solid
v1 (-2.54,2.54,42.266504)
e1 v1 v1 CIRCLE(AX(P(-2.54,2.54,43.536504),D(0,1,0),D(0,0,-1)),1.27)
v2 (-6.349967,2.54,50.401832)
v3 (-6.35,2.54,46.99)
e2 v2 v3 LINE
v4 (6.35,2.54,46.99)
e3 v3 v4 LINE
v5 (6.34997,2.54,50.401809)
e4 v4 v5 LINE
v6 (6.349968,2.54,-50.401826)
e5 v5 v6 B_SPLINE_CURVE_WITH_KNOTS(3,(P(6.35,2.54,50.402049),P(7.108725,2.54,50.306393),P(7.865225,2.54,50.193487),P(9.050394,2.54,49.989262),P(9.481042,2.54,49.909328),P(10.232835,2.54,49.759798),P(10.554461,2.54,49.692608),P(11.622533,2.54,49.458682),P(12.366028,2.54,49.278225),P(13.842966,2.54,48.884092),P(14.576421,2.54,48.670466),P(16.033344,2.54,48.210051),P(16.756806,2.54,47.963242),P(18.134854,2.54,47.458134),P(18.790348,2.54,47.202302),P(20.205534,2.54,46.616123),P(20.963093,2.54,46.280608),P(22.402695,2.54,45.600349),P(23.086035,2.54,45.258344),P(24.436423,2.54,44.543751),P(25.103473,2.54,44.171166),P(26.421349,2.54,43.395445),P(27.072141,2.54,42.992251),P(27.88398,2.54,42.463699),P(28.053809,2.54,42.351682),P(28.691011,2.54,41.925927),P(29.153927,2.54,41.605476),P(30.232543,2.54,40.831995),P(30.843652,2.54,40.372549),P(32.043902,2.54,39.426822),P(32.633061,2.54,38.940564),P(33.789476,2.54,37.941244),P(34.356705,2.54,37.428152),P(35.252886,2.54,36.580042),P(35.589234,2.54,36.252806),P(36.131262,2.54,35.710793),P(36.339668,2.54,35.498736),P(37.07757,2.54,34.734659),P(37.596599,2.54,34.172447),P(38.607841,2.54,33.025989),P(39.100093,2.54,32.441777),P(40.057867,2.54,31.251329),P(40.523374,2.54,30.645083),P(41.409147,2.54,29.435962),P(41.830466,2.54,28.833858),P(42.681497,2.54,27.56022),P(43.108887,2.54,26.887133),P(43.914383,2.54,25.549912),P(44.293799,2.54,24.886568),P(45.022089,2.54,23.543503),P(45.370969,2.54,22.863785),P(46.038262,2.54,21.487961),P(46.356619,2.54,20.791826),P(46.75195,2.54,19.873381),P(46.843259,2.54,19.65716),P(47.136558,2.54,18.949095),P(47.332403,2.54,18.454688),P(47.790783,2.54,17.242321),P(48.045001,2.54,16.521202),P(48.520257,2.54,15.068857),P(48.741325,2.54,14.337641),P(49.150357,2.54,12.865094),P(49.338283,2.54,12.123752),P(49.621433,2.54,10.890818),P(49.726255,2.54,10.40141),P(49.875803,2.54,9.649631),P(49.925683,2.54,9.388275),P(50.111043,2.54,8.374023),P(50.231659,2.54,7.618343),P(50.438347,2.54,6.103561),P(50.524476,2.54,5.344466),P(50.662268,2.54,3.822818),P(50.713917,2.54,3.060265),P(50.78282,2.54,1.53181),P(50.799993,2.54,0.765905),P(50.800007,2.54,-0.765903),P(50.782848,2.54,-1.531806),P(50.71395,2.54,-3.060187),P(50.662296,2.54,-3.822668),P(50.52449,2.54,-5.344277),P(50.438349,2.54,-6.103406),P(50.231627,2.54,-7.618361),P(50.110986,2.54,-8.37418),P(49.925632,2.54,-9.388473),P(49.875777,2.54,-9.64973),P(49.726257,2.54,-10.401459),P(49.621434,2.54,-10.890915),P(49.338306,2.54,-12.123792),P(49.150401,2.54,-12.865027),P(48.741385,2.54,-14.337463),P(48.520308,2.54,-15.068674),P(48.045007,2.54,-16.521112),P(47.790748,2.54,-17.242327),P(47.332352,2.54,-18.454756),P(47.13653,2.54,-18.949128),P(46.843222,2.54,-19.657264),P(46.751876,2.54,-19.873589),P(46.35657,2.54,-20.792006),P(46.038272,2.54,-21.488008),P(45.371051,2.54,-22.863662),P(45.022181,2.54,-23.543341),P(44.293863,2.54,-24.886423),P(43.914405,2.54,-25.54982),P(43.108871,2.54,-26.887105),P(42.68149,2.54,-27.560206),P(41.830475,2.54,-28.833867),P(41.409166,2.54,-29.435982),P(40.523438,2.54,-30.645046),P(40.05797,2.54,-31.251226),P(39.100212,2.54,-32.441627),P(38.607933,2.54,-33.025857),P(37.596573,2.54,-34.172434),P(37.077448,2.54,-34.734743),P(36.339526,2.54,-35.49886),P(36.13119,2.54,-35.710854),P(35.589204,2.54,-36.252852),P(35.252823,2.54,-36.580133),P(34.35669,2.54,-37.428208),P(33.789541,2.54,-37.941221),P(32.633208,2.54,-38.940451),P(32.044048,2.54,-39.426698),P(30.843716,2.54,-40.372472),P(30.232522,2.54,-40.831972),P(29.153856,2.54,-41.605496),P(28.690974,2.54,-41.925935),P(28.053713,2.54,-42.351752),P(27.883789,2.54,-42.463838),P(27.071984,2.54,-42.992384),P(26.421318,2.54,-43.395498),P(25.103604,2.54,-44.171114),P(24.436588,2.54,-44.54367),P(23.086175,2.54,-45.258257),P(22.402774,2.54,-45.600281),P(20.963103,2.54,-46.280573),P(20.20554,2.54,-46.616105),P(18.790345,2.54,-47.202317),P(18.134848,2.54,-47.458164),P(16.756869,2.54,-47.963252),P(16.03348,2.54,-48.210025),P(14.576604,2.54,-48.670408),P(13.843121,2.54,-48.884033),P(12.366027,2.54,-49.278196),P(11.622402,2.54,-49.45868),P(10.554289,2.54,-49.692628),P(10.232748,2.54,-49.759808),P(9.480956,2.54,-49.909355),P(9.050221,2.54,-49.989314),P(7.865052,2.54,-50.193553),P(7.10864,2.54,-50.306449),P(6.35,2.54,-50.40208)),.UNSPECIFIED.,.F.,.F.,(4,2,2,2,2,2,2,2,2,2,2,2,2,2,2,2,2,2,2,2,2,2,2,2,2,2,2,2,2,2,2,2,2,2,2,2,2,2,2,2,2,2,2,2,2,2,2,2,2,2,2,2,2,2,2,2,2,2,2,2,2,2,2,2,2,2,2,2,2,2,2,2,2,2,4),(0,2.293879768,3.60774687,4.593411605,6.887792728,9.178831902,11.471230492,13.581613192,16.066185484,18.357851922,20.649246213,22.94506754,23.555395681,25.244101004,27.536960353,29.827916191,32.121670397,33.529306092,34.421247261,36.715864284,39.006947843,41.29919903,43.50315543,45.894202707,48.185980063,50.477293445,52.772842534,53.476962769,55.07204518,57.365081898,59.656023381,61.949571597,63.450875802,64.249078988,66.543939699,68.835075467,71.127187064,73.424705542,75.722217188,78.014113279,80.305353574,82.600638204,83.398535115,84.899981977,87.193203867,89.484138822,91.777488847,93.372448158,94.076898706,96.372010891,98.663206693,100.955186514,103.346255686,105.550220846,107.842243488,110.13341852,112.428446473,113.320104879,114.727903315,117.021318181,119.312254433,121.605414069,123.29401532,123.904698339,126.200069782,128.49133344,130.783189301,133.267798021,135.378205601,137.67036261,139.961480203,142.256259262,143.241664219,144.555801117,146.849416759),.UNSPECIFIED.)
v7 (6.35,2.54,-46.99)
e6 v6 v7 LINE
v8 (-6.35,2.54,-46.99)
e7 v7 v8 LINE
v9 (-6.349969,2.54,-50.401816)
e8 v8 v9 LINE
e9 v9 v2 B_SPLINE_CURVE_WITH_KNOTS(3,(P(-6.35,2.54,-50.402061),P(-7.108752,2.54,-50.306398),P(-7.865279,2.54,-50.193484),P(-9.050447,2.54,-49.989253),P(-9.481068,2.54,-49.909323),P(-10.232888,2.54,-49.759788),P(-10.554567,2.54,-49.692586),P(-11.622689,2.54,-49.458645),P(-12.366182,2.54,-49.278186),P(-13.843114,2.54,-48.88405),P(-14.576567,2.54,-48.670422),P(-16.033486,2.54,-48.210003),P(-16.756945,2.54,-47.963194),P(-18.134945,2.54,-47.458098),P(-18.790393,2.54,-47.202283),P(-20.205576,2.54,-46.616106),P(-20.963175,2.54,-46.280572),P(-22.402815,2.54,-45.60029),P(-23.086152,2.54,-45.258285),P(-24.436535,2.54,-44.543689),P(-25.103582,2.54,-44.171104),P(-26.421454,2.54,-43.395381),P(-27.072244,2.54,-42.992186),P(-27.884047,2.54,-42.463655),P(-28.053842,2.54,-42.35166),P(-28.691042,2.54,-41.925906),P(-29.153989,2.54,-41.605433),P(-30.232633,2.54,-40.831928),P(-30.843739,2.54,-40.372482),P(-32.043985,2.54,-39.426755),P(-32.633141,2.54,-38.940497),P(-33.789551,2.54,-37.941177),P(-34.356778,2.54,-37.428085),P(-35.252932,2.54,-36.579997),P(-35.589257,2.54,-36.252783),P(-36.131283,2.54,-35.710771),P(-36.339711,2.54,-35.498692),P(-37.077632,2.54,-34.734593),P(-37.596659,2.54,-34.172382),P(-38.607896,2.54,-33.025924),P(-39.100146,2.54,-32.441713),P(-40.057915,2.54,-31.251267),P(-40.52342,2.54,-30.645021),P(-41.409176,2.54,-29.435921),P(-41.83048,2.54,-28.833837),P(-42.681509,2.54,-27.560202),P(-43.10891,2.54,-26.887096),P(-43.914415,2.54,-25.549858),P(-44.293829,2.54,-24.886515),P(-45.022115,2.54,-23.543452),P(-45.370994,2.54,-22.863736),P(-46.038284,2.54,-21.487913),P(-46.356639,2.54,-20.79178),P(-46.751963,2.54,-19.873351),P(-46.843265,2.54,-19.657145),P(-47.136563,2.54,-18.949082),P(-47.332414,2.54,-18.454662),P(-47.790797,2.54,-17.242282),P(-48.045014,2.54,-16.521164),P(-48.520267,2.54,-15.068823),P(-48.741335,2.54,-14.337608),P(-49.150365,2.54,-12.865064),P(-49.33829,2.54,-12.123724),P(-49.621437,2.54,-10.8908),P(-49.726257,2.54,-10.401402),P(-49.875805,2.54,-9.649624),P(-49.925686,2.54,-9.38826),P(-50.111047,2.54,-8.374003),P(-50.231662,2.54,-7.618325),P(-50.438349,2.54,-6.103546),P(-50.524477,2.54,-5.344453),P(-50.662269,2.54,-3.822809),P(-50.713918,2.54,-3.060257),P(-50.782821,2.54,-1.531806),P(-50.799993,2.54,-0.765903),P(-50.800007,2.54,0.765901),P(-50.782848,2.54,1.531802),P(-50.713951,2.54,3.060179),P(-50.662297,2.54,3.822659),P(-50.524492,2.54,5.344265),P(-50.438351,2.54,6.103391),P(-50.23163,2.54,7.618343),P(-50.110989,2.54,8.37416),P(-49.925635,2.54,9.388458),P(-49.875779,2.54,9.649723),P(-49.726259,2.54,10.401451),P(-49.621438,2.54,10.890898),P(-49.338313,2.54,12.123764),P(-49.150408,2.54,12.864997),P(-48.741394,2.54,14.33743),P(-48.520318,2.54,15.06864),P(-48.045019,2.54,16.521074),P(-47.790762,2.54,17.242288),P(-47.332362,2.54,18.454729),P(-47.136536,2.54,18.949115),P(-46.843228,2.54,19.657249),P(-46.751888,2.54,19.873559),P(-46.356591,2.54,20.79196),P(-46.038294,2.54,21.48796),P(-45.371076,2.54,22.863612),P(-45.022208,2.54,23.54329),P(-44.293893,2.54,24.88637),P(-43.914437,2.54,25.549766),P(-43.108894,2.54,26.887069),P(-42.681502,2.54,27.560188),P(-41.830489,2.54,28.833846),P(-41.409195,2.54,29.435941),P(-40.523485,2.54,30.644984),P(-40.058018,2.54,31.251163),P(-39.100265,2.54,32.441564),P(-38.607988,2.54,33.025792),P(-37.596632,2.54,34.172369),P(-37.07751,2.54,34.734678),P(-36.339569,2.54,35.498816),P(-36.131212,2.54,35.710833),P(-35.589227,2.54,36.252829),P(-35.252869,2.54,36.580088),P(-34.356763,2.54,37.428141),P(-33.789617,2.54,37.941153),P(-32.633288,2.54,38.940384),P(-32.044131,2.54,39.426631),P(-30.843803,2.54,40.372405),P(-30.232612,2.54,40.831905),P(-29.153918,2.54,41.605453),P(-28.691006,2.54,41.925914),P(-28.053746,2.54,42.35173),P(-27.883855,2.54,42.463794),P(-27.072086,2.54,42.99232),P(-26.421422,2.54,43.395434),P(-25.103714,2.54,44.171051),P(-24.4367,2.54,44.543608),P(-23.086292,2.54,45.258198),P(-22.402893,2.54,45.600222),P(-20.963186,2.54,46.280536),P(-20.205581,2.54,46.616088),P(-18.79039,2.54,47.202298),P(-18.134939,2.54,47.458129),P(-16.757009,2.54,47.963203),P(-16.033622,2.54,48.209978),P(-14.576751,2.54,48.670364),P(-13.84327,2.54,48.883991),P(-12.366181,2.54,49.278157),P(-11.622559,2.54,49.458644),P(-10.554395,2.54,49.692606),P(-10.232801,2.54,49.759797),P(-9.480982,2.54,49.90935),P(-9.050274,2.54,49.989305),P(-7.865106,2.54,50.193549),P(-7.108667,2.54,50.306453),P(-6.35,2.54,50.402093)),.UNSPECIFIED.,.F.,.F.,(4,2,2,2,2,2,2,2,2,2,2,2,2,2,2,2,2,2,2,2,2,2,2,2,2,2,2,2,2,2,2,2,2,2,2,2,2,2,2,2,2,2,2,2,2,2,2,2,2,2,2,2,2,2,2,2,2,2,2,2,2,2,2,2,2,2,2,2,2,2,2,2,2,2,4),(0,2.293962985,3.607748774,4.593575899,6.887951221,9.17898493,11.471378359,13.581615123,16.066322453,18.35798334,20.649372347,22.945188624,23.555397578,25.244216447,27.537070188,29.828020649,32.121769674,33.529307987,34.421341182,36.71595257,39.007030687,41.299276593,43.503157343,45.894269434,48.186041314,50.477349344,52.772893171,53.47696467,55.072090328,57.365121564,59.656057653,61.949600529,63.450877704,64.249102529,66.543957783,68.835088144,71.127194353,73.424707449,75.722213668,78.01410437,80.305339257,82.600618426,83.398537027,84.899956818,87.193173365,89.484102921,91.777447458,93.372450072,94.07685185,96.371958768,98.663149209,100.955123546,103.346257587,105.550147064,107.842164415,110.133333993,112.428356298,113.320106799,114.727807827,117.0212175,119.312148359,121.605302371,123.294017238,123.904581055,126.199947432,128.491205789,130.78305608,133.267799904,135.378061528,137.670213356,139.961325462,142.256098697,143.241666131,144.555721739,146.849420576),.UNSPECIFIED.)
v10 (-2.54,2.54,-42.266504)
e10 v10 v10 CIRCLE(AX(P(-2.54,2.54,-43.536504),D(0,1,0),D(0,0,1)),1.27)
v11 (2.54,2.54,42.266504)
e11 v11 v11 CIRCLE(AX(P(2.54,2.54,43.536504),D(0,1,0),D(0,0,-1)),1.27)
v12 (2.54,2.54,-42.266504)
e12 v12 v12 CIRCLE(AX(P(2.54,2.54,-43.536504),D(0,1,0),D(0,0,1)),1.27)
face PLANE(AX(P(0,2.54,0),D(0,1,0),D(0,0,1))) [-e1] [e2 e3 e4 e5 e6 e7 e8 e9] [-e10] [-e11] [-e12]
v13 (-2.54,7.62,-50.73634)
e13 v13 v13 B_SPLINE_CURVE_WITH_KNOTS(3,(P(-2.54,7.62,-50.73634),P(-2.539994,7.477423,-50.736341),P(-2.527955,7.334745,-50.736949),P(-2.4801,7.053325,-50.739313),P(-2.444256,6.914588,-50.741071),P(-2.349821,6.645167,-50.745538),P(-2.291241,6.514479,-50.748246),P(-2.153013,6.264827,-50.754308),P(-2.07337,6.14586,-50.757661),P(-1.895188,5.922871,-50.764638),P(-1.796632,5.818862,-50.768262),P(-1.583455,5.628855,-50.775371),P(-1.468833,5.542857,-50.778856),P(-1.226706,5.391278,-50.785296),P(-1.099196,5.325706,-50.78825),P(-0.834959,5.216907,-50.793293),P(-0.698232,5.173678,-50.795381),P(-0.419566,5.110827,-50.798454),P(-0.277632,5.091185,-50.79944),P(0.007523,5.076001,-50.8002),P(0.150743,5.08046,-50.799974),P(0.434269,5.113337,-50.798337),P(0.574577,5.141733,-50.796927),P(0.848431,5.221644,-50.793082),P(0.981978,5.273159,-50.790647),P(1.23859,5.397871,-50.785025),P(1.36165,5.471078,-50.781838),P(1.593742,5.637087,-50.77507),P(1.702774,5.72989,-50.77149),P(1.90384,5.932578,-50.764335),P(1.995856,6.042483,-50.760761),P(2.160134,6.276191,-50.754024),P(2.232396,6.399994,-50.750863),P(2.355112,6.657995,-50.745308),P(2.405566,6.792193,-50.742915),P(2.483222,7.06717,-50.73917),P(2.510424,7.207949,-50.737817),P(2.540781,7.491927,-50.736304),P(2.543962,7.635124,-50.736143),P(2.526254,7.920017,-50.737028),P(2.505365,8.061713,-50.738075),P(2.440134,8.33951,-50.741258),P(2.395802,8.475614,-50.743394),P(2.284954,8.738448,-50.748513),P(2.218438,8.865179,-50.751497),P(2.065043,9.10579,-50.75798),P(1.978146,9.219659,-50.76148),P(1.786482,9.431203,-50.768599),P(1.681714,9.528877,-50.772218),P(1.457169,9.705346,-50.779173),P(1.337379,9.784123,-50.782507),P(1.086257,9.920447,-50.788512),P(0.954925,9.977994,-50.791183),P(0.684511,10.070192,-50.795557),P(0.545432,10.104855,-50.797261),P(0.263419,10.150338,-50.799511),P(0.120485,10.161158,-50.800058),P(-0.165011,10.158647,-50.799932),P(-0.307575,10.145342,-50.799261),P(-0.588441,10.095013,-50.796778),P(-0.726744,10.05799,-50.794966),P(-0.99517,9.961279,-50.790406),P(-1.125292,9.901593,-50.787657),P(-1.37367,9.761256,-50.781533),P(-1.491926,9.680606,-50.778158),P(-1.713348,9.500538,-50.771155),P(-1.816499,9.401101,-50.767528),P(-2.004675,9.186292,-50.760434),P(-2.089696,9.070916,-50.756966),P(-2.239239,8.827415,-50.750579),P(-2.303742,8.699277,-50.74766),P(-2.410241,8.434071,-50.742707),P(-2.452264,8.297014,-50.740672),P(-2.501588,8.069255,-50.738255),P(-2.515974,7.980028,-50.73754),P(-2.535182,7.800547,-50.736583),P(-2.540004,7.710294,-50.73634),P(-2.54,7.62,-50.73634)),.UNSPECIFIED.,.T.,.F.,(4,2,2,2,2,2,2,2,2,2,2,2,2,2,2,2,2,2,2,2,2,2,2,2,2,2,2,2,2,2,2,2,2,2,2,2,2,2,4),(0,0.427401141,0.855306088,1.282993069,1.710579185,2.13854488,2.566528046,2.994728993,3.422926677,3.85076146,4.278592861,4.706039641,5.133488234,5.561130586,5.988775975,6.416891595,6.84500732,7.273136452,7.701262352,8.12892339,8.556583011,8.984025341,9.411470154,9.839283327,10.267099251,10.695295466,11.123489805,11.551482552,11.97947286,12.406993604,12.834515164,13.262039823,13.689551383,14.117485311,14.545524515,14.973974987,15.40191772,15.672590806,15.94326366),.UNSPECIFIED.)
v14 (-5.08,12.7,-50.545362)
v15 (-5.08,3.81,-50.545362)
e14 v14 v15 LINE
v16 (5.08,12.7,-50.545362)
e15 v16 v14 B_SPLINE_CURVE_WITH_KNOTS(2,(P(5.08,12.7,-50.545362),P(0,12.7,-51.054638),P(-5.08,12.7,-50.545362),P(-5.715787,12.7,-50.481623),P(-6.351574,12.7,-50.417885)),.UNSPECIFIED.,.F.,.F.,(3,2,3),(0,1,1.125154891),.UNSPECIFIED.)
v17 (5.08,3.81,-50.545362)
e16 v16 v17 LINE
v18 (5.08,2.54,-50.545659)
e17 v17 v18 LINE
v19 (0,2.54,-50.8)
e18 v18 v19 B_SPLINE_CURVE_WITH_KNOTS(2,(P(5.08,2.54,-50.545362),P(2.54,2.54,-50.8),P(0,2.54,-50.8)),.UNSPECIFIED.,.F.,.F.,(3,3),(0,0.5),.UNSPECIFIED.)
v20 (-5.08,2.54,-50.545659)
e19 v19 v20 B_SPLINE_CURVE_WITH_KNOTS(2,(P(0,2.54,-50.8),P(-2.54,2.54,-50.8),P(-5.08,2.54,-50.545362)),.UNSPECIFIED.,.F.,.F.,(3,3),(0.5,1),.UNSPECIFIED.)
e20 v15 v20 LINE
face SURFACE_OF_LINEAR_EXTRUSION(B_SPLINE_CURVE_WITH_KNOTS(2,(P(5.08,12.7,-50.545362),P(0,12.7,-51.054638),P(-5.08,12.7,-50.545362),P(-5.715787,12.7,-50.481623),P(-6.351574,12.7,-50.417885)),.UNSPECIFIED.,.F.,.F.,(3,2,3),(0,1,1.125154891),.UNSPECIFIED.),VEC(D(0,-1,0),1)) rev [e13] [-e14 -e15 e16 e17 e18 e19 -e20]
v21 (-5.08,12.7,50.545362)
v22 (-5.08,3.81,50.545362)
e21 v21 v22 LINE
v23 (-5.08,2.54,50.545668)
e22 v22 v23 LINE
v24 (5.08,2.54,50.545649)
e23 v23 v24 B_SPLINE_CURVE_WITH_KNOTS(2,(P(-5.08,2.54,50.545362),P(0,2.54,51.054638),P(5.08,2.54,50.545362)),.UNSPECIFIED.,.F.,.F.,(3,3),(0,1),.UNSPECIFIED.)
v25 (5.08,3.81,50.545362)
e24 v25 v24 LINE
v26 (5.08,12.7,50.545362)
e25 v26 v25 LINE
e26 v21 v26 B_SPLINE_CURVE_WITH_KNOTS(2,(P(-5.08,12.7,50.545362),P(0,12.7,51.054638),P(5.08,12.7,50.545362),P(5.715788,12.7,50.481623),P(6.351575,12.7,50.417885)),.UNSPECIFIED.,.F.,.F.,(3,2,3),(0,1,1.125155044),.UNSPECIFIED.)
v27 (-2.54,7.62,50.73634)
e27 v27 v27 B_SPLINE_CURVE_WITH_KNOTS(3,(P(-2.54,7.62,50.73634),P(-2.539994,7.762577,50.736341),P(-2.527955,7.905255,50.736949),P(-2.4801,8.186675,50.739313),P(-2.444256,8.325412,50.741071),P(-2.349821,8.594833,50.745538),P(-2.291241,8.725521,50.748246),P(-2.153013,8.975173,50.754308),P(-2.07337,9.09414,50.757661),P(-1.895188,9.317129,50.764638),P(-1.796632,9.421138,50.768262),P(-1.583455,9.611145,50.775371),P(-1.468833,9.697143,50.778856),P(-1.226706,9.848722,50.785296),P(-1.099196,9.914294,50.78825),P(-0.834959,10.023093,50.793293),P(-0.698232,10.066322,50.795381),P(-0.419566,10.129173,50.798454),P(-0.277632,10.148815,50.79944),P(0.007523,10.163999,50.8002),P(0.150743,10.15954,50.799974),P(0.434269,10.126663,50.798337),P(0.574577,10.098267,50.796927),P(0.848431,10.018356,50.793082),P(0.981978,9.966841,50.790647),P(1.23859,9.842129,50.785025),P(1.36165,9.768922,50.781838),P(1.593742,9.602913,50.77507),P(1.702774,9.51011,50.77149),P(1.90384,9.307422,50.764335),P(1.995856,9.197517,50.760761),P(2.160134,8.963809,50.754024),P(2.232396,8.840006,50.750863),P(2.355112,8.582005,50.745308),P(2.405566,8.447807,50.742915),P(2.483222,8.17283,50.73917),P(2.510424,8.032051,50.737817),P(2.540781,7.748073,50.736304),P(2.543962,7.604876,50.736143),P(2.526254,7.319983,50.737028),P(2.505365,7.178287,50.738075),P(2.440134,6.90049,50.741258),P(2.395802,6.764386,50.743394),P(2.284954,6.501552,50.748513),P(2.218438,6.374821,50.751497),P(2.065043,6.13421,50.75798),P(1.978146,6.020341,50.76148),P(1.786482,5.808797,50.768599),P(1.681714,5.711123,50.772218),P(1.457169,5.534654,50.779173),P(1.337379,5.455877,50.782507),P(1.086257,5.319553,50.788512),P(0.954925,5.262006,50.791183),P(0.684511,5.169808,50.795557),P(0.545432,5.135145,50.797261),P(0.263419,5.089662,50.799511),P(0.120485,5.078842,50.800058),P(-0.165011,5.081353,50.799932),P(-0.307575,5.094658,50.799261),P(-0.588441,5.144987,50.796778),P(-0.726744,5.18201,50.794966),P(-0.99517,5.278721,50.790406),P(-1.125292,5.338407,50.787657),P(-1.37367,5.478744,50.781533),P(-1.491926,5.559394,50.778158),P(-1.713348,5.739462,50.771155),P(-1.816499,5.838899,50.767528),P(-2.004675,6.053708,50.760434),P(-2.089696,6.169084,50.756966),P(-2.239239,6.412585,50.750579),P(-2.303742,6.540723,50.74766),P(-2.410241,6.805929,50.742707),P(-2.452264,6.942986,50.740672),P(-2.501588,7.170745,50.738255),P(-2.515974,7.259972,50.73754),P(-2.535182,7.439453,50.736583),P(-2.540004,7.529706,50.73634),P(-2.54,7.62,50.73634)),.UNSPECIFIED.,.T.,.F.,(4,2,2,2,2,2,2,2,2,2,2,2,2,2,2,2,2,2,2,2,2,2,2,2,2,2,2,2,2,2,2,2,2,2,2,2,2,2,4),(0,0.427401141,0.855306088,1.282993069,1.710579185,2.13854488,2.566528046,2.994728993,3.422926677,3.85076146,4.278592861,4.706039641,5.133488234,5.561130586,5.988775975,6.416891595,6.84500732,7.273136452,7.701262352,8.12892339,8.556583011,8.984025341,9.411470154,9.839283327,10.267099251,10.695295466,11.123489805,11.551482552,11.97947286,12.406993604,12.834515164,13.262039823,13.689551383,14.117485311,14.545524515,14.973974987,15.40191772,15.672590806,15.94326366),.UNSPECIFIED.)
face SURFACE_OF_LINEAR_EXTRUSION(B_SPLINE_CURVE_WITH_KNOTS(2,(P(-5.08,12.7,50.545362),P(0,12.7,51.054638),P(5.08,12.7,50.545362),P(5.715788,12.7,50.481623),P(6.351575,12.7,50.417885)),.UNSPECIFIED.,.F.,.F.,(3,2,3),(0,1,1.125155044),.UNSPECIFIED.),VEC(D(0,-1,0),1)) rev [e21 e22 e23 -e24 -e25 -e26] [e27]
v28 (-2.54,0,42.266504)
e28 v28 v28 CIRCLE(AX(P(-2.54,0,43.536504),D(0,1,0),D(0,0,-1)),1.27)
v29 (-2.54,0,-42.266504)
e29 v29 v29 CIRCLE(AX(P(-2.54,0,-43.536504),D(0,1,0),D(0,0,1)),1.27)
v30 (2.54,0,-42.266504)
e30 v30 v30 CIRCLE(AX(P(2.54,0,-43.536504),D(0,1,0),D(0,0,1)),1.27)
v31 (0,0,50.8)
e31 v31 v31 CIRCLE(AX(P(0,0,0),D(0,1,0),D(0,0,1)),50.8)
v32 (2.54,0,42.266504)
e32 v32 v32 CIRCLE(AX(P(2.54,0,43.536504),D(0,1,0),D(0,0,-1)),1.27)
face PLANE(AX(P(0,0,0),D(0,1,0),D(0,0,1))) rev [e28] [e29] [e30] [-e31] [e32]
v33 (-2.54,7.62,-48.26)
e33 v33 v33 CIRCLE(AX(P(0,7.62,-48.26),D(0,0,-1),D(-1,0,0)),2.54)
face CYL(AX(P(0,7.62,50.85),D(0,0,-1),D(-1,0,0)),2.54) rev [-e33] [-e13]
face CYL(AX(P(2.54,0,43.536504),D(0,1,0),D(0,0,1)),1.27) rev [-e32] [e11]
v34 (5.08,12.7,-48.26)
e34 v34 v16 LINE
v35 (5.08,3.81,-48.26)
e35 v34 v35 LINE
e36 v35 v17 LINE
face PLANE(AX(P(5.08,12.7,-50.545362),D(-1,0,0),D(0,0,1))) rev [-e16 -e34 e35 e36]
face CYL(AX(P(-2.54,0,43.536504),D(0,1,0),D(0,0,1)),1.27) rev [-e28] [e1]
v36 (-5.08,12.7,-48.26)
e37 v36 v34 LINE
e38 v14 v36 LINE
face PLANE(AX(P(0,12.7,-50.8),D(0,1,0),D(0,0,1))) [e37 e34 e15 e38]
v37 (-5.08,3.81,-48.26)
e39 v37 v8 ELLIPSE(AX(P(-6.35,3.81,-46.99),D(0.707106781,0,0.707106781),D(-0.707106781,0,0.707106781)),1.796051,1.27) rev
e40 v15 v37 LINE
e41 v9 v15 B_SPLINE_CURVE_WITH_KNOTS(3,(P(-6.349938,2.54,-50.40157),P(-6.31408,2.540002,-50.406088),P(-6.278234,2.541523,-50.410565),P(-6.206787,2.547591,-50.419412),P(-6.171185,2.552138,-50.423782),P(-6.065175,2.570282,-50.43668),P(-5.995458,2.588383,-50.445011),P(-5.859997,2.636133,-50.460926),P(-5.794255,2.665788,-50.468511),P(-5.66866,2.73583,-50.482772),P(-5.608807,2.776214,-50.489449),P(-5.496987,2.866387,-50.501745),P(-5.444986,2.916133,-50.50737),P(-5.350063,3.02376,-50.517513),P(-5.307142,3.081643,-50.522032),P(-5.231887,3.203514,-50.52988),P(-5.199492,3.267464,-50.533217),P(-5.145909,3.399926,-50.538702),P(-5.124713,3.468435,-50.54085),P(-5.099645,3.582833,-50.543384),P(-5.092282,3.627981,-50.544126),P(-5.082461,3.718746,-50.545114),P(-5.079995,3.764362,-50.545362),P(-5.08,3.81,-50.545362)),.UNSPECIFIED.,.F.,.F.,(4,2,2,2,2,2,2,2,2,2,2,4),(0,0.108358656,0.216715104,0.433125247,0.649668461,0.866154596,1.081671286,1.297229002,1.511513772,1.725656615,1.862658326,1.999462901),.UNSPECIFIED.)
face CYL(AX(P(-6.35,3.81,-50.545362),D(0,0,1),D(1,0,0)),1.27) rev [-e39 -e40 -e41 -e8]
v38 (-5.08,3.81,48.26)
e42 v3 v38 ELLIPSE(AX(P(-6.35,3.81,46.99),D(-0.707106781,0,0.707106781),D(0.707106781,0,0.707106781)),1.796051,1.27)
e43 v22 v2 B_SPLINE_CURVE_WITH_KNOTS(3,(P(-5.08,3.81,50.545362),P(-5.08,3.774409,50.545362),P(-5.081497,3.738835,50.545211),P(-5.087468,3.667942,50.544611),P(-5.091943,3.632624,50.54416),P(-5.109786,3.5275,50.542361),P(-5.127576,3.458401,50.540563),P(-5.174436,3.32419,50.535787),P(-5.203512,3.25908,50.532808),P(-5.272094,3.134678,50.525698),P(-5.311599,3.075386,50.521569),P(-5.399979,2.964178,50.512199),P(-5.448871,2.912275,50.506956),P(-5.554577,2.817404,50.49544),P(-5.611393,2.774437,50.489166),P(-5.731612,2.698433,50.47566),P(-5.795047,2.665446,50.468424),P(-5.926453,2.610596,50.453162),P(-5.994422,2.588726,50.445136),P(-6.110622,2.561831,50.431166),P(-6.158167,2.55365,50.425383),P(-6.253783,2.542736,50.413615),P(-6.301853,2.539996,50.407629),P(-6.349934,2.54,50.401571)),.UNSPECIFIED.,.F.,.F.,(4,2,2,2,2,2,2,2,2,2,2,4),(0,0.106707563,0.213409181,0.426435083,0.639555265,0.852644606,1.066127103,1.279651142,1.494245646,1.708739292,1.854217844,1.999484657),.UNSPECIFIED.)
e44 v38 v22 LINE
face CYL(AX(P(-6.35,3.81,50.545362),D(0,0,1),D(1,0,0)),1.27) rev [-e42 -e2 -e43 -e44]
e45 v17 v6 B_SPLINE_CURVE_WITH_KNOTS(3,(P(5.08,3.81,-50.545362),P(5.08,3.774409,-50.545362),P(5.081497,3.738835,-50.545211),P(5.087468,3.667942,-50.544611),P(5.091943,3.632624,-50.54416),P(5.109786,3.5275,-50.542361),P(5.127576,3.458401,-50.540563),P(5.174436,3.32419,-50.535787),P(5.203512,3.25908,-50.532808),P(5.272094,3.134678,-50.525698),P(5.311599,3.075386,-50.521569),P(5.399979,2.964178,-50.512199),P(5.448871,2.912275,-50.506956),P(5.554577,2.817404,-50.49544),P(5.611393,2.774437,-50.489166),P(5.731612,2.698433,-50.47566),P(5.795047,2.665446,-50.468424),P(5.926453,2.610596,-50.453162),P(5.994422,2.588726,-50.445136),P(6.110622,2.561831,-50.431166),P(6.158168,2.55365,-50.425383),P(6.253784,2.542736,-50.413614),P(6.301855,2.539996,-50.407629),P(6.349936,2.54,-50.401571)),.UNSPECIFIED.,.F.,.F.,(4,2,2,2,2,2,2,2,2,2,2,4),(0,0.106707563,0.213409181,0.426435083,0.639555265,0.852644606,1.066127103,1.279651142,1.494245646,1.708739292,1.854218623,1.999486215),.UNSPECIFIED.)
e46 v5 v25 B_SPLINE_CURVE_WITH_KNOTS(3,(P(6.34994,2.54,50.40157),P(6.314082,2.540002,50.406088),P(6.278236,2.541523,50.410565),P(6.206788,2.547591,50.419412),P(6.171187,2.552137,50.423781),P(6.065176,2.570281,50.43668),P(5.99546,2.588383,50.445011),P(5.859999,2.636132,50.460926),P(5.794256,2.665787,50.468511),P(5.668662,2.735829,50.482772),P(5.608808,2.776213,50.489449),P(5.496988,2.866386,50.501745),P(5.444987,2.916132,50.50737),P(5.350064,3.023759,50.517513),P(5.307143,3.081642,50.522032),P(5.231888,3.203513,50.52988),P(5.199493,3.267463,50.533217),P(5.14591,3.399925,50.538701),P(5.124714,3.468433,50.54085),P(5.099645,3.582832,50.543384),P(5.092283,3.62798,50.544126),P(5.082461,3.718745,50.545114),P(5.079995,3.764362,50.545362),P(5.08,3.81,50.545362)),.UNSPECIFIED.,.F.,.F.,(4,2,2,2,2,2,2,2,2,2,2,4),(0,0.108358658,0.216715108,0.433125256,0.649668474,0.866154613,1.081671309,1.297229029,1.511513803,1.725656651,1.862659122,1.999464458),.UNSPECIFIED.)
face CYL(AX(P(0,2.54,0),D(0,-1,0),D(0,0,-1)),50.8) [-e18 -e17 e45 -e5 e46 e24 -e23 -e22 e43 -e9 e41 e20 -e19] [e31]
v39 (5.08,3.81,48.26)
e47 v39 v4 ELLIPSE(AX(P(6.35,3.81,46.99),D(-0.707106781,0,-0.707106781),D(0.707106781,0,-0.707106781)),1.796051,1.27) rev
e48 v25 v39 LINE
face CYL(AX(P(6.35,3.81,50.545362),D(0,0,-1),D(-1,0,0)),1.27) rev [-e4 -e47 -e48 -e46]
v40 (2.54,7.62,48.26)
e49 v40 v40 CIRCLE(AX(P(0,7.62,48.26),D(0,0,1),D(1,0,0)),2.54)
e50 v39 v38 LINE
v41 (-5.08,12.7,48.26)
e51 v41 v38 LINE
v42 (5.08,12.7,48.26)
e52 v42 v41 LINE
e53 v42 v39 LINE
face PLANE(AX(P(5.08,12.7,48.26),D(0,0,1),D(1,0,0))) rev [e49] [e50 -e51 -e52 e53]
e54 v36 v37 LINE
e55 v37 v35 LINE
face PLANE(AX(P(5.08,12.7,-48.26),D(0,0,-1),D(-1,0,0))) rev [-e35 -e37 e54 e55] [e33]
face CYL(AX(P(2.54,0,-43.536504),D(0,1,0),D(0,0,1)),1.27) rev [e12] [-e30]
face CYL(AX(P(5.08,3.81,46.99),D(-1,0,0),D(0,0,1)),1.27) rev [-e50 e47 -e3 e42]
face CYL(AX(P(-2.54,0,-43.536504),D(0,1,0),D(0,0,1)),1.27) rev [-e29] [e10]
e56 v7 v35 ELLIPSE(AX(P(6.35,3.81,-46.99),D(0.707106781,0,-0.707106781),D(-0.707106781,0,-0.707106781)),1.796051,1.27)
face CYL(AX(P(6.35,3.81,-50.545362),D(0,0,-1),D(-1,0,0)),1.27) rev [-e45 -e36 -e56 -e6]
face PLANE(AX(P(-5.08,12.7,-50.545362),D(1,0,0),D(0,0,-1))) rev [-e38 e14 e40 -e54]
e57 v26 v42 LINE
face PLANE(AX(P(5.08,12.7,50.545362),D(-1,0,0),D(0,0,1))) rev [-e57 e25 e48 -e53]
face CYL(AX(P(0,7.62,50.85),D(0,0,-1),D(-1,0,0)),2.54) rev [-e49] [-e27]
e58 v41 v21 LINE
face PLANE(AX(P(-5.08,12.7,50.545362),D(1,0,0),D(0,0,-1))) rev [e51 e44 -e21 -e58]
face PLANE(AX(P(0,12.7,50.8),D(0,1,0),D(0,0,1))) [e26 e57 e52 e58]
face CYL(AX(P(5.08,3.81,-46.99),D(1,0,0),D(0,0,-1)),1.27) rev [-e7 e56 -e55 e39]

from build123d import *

# Parameters (mm, degrees)
SKETCH1_R               = 50.8
BOSS_EXTRUDE1_DEPTH     = 2.54
BOSS_EXTRUDE2_DEPTH     = 10.16
FILLET1_R               = 1.27
CUT_EXTRUDE1_DEPTH      = 113.048264746
CUT_EXTRUDE1_DEPTH_BACK = 113.048264746
SKETCH3_R               = 2.54
SKETCH5_R               = 1.27
CUT_EXTRUDE2_DEPTH      = 73.556912988


# Read off the part's stored shape, not the designer's step: Boss-Extrude2
with BuildPart() as part:
    # Sketch1 → Boss-Extrude1 (new body)
    with BuildSketch(Plane(origin=(0, 0, 0), x_dir=(1, 0, 0), z_dir=(0, 1, 0))):
        with Locations(Location((0, 0, 0), (0, 0, 270))):
            Circle(SKETCH1_R)
    extrude(amount=BOSS_EXTRUDE1_DEPTH)


with BuildPart() as boss_extrude2_tool:
    # Boss-Extrude2 outline → Boss-Extrude2 (new body)
    with BuildSketch(Plane(origin=(0, 2.54, 0), x_dir=(1, 0, 0), z_dir=(0, 1, 0))):
        with BuildLine():
            Line((-5.08, -48.26), (-5.08, -50.545361805))
            add(Edge.make_bspline(
                [(5.08, -50.545361805), (0, -51.054638195), (-5.08, -50.545361805)],
                knots=[0, 0, 0, 1, 1, 1], degree=2))
            Line((5.08, -50.545361805), (5.08, -48.26))
            Line((5.08, -48.26), (-5.08, -48.26))
        make_face()
        with BuildLine():
            Line((5.08, 48.26), (5.08, 50.545361805))
            add(Edge.make_bspline(
                [(-5.08, 50.545361805), (0, 51.054638195), (5.08, 50.545361805)],
                knots=[0, 0, 0, 1, 1, 1], degree=2))
            Line((-5.08, 50.545361805), (-5.08, 48.26))
            Line((-5.08, 48.26), (5.08, 48.26))
        make_face()
    extrude(amount=BOSS_EXTRUDE2_DEPTH)


with BuildPart() as part_1:
    add(part.part)


with BuildPart() as part_2:
    # Boss-Extrude2: joined with boss_extrude2_tool
    add(part_1.part.fuse(boss_extrude2_tool.part, tol=0.00001))

    # Fillet1
    # the kernel refuses this fillet: 1.27 mm, written as the material it adds along each edge
    with BuildSketch(Plane(origin=(-5.08, 2.54, -48.26), x_dir=(0, 0, 1), z_dir=(1, 0, 0)), Plane(origin=(5.08, 2.54, 48.26), x_dir=(0, 0, -1), z_dir=(-1, 0, 0))) as fillet1_piece_1:
        with BuildLine():
            CenterArc((FILLET1_R, -FILLET1_R), FILLET1_R, 90, 90)
            Line((0, -FILLET1_R), (0, 0))
            Line((0, 0), (FILLET1_R, 0))
        make_face()
    extrude(amount=10.16)
    with BuildSketch(Plane(origin=(5.08, 2.54, -48.26), x_dir=(1, 0, 0), z_dir=(0, 0, -1))) as fillet1_piece_2_section:
        with BuildLine():
            CenterArc((FILLET1_R, -FILLET1_R), FILLET1_R, 90, 90)
            Line((0, -FILLET1_R), (0, 0))
            Line((0, 0), (FILLET1_R, 0))
        make_face()
    fillet1_piece_2 = extrude(amount=5.460361805, mode=Mode.PRIVATE)
    fillet1_piece_2 = fillet1_piece_2 & Plane(origin=(0, 2.829642474, 0), x_dir=(0, 0, 1), z_dir=(0, -1, 0)) * Cylinder(50.8, 17, mode=Mode.PRIVATE)
    add(fillet1_piece_2)
    with BuildSketch(Plane(origin=(5.08, 2.54, 53.720361805), x_dir=(1, 0, 0), z_dir=(0, 0, -1))) as fillet1_piece_3_section:
        with BuildLine():
            CenterArc((FILLET1_R, -FILLET1_R), FILLET1_R, 90, 90)
            Line((0, -FILLET1_R), (0, 0))
            Line((0, 0), (FILLET1_R, 0))
        make_face()
    fillet1_piece_3 = extrude(amount=5.460361805, mode=Mode.PRIVATE)
    fillet1_piece_3 = fillet1_piece_3 & Plane(origin=(0, 2.829642639, 0), x_dir=(0, 0, 1), z_dir=(0, -1, 0)) * Cylinder(50.8, 17, mode=Mode.PRIVATE)
    add(fillet1_piece_3)
    with BuildSketch(Plane(origin=(-5.08, 2.54, 48.26), x_dir=(-1, 0, 0), z_dir=(0, 0, 1))) as fillet1_piece_4_section:
        with BuildLine():
            CenterArc((FILLET1_R, -FILLET1_R), FILLET1_R, 90, 90)
            Line((0, -FILLET1_R), (0, 0))
            Line((0, 0), (FILLET1_R, 0))
        make_face()
    fillet1_piece_4 = extrude(amount=5.460361805, mode=Mode.PRIVATE)
    fillet1_piece_4 = fillet1_piece_4 & Plane(origin=(0, 2.829642474, 0), x_dir=(0, 0, 1), z_dir=(0, -1, 0)) * Cylinder(50.8, 17, mode=Mode.PRIVATE)
    add(fillet1_piece_4)
    with BuildSketch(Plane(origin=(-5.08, 2.54, -53.720361805), x_dir=(-1, 0, 0), z_dir=(0, 0, 1))) as fillet1_piece_5_section:
        with BuildLine():
            CenterArc((FILLET1_R, -FILLET1_R), FILLET1_R, 90, 90)
            Line((0, -FILLET1_R), (0, 0))
            Line((0, 0), (FILLET1_R, 0))
        make_face()
    fillet1_piece_5 = extrude(amount=5.460361805, mode=Mode.PRIVATE)
    fillet1_piece_5 = fillet1_piece_5 & Plane(origin=(0, 2.829642639, 0), x_dir=(0, 0, 1), z_dir=(0, -1, 0)) * Cylinder(50.8, 17, mode=Mode.PRIVATE)
    add(fillet1_piece_5)
    with BuildSketch(Plane(origin=(-5.08, 2.54, -53.720361805), x_dir=(-1, 0, 0), z_dir=(0, 0, 1))) as fillet1_piece_6a_section:
        with BuildLine():
            CenterArc((FILLET1_R, -FILLET1_R), FILLET1_R, 90, 90)
            Line((0, -FILLET1_R), (0, 0))
            Line((0, 0), (FILLET1_R, 0))
        make_face()
    fillet1_piece_6a = extrude(amount=8.635361805, mode=Mode.PRIVATE)
    fillet1_piece_6a = split(fillet1_piece_6a, bisect_by=Plane(origin=(-5.367521795, 2.827521795, -48.26), z_dir=(0, 0, 1)), keep=Keep.TOP, mode=Mode.PRIVATE)
    with BuildSketch(Plane(origin=(-8.255, 2.54, -48.26), x_dir=(0, 0, 1), z_dir=(1, 0, 0))) as fillet1_piece_6b_section:
        with BuildLine():
            CenterArc((FILLET1_R, -FILLET1_R), FILLET1_R, 90, 90)
            Line((0, -FILLET1_R), (0, 0))
            Line((0, 0), (FILLET1_R, 0))
        make_face()
    fillet1_piece_6b = extrude(amount=13.335, mode=Mode.PRIVATE)
    fillet1_piece_6b = split(fillet1_piece_6b, bisect_by=Plane(origin=(-5.08, 2.827521795, -47.972478205), z_dir=(-1, 0, 0)), keep=Keep.TOP, mode=Mode.PRIVATE)
    fillet1_piece_6 = fillet1_piece_6a & fillet1_piece_6b
    add(fillet1_piece_6)
    with BuildSketch(Plane(origin=(-5.08, 2.54, -48.26), x_dir=(0, 0, 1), z_dir=(1, 0, 0))) as fillet1_piece_7a_section:
        with BuildLine():
            CenterArc((FILLET1_R, -FILLET1_R), FILLET1_R, 90, 90)
            Line((0, -FILLET1_R), (0, 0))
            Line((0, 0), (FILLET1_R, 0))
        make_face()
    fillet1_piece_7a = extrude(amount=13.335, mode=Mode.PRIVATE)
    fillet1_piece_7a = split(fillet1_piece_7a, bisect_by=Plane(origin=(5.08, 2.827521795, -47.972478205), z_dir=(1, 0, 0)), keep=Keep.TOP, mode=Mode.PRIVATE)
    with BuildSketch(Plane(origin=(5.08, 2.54, -45.085), x_dir=(1, 0, 0), z_dir=(0, 0, -1))) as fillet1_piece_7b_section:
        with BuildLine():
            CenterArc((FILLET1_R, -FILLET1_R), FILLET1_R, 90, 90)
            Line((0, -FILLET1_R), (0, 0))
            Line((0, 0), (FILLET1_R, 0))
        make_face()
    fillet1_piece_7b = extrude(amount=8.635361805, mode=Mode.PRIVATE)
    fillet1_piece_7b = split(fillet1_piece_7b, bisect_by=Plane(origin=(5.367521795, 2.827521795, -48.26), z_dir=(0, 0, 1)), keep=Keep.TOP, mode=Mode.PRIVATE)
    fillet1_piece_7 = fillet1_piece_7a & fillet1_piece_7b
    add(fillet1_piece_7)
    with BuildSketch(Plane(origin=(5.08, 2.54, 53.720361805), x_dir=(1, 0, 0), z_dir=(0, 0, -1))) as fillet1_piece_8a_section:
        with BuildLine():
            CenterArc((FILLET1_R, -FILLET1_R), FILLET1_R, 90, 90)
            Line((0, -FILLET1_R), (0, 0))
            Line((0, 0), (FILLET1_R, 0))
        make_face()
    fillet1_piece_8a = extrude(amount=8.635361805, mode=Mode.PRIVATE)
    fillet1_piece_8a = split(fillet1_piece_8a, bisect_by=Plane(origin=(5.367521795, 2.827521795, 48.26), z_dir=(0, 0, -1)), keep=Keep.TOP, mode=Mode.PRIVATE)
    with BuildSketch(Plane(origin=(8.255, 2.54, 48.26), x_dir=(0, 0, -1), z_dir=(-1, 0, 0))) as fillet1_piece_8b_section:
        with BuildLine():
            CenterArc((FILLET1_R, -FILLET1_R), FILLET1_R, 90, 90)
            Line((0, -FILLET1_R), (0, 0))
            Line((0, 0), (FILLET1_R, 0))
        make_face()
    fillet1_piece_8b = extrude(amount=13.335, mode=Mode.PRIVATE)
    fillet1_piece_8b = split(fillet1_piece_8b, bisect_by=Plane(origin=(5.08, 2.827521795, 47.972478205), z_dir=(1, 0, 0)), keep=Keep.TOP, mode=Mode.PRIVATE)
    fillet1_piece_8 = fillet1_piece_8a & fillet1_piece_8b
    add(fillet1_piece_8)
    with BuildSketch(Plane(origin=(5.08, 2.54, 48.26), x_dir=(0, 0, -1), z_dir=(-1, 0, 0))) as fillet1_piece_9a_section:
        with BuildLine():
            CenterArc((FILLET1_R, -FILLET1_R), FILLET1_R, 90, 90)
            Line((0, -FILLET1_R), (0, 0))
            Line((0, 0), (FILLET1_R, 0))
        make_face()
    fillet1_piece_9a = extrude(amount=13.335, mode=Mode.PRIVATE)
    fillet1_piece_9a = split(fillet1_piece_9a, bisect_by=Plane(origin=(-5.08, 2.827521795, 47.972478205), z_dir=(-1, 0, 0)), keep=Keep.TOP, mode=Mode.PRIVATE)
    with BuildSketch(Plane(origin=(-5.08, 2.54, 45.085), x_dir=(-1, 0, 0), z_dir=(0, 0, 1))) as fillet1_piece_9b_section:
        with BuildLine():
            CenterArc((FILLET1_R, -FILLET1_R), FILLET1_R, 90, 90)
            Line((0, -FILLET1_R), (0, 0))
            Line((0, 0), (FILLET1_R, 0))
        make_face()
    fillet1_piece_9b = extrude(amount=8.635361805, mode=Mode.PRIVATE)
    fillet1_piece_9b = split(fillet1_piece_9b, bisect_by=Plane(origin=(-5.367521795, 2.827521795, 48.26), z_dir=(0, 0, -1)), keep=Keep.TOP, mode=Mode.PRIVATE)
    fillet1_piece_9 = fillet1_piece_9a & fillet1_piece_9b
    add(fillet1_piece_9)

    # Sketch3 → Cut-Extrude1 (cut, two sides: drawn at the far end of the back side and taken through both)
    with BuildSketch(Plane(origin=(0, 0, 48.26), x_dir=(-1, 0, 0), z_dir=(0, 0, -1)).offset(-CUT_EXTRUDE1_DEPTH_BACK)):
        with Locations((0, 7.62)):
            Circle(SKETCH3_R)
    extrude(amount=CUT_EXTRUDE1_DEPTH + CUT_EXTRUDE1_DEPTH_BACK, mode=Mode.SUBTRACT)

    # Sketch5 → Cut-Extrude2 (cut, through all)
    with BuildSketch(Plane(origin=(0, 2.54, 0), x_dir=(1, 0, 0), z_dir=(0, 1, 0))):
        with Locations(Location((-2.54, 43.536503653, 0), (0, 0, 270))):
            Circle(SKETCH5_R)
        with Locations(Location((2.54, 43.536503653, 0), (0, 0, 270))):
            Circle(SKETCH5_R)
        with Locations(Location((2.54, -43.536503653, 0), (0, 0, 90))):
            Circle(SKETCH5_R)
        with Locations(Location((-2.54, -43.536503653, 0), (0, 0, 90))):
            Circle(SKETCH5_R)
    extrude(amount=-CUT_EXTRUDE2_DEPTH, mode=Mode.SUBTRACT)


solid = part_2.part
